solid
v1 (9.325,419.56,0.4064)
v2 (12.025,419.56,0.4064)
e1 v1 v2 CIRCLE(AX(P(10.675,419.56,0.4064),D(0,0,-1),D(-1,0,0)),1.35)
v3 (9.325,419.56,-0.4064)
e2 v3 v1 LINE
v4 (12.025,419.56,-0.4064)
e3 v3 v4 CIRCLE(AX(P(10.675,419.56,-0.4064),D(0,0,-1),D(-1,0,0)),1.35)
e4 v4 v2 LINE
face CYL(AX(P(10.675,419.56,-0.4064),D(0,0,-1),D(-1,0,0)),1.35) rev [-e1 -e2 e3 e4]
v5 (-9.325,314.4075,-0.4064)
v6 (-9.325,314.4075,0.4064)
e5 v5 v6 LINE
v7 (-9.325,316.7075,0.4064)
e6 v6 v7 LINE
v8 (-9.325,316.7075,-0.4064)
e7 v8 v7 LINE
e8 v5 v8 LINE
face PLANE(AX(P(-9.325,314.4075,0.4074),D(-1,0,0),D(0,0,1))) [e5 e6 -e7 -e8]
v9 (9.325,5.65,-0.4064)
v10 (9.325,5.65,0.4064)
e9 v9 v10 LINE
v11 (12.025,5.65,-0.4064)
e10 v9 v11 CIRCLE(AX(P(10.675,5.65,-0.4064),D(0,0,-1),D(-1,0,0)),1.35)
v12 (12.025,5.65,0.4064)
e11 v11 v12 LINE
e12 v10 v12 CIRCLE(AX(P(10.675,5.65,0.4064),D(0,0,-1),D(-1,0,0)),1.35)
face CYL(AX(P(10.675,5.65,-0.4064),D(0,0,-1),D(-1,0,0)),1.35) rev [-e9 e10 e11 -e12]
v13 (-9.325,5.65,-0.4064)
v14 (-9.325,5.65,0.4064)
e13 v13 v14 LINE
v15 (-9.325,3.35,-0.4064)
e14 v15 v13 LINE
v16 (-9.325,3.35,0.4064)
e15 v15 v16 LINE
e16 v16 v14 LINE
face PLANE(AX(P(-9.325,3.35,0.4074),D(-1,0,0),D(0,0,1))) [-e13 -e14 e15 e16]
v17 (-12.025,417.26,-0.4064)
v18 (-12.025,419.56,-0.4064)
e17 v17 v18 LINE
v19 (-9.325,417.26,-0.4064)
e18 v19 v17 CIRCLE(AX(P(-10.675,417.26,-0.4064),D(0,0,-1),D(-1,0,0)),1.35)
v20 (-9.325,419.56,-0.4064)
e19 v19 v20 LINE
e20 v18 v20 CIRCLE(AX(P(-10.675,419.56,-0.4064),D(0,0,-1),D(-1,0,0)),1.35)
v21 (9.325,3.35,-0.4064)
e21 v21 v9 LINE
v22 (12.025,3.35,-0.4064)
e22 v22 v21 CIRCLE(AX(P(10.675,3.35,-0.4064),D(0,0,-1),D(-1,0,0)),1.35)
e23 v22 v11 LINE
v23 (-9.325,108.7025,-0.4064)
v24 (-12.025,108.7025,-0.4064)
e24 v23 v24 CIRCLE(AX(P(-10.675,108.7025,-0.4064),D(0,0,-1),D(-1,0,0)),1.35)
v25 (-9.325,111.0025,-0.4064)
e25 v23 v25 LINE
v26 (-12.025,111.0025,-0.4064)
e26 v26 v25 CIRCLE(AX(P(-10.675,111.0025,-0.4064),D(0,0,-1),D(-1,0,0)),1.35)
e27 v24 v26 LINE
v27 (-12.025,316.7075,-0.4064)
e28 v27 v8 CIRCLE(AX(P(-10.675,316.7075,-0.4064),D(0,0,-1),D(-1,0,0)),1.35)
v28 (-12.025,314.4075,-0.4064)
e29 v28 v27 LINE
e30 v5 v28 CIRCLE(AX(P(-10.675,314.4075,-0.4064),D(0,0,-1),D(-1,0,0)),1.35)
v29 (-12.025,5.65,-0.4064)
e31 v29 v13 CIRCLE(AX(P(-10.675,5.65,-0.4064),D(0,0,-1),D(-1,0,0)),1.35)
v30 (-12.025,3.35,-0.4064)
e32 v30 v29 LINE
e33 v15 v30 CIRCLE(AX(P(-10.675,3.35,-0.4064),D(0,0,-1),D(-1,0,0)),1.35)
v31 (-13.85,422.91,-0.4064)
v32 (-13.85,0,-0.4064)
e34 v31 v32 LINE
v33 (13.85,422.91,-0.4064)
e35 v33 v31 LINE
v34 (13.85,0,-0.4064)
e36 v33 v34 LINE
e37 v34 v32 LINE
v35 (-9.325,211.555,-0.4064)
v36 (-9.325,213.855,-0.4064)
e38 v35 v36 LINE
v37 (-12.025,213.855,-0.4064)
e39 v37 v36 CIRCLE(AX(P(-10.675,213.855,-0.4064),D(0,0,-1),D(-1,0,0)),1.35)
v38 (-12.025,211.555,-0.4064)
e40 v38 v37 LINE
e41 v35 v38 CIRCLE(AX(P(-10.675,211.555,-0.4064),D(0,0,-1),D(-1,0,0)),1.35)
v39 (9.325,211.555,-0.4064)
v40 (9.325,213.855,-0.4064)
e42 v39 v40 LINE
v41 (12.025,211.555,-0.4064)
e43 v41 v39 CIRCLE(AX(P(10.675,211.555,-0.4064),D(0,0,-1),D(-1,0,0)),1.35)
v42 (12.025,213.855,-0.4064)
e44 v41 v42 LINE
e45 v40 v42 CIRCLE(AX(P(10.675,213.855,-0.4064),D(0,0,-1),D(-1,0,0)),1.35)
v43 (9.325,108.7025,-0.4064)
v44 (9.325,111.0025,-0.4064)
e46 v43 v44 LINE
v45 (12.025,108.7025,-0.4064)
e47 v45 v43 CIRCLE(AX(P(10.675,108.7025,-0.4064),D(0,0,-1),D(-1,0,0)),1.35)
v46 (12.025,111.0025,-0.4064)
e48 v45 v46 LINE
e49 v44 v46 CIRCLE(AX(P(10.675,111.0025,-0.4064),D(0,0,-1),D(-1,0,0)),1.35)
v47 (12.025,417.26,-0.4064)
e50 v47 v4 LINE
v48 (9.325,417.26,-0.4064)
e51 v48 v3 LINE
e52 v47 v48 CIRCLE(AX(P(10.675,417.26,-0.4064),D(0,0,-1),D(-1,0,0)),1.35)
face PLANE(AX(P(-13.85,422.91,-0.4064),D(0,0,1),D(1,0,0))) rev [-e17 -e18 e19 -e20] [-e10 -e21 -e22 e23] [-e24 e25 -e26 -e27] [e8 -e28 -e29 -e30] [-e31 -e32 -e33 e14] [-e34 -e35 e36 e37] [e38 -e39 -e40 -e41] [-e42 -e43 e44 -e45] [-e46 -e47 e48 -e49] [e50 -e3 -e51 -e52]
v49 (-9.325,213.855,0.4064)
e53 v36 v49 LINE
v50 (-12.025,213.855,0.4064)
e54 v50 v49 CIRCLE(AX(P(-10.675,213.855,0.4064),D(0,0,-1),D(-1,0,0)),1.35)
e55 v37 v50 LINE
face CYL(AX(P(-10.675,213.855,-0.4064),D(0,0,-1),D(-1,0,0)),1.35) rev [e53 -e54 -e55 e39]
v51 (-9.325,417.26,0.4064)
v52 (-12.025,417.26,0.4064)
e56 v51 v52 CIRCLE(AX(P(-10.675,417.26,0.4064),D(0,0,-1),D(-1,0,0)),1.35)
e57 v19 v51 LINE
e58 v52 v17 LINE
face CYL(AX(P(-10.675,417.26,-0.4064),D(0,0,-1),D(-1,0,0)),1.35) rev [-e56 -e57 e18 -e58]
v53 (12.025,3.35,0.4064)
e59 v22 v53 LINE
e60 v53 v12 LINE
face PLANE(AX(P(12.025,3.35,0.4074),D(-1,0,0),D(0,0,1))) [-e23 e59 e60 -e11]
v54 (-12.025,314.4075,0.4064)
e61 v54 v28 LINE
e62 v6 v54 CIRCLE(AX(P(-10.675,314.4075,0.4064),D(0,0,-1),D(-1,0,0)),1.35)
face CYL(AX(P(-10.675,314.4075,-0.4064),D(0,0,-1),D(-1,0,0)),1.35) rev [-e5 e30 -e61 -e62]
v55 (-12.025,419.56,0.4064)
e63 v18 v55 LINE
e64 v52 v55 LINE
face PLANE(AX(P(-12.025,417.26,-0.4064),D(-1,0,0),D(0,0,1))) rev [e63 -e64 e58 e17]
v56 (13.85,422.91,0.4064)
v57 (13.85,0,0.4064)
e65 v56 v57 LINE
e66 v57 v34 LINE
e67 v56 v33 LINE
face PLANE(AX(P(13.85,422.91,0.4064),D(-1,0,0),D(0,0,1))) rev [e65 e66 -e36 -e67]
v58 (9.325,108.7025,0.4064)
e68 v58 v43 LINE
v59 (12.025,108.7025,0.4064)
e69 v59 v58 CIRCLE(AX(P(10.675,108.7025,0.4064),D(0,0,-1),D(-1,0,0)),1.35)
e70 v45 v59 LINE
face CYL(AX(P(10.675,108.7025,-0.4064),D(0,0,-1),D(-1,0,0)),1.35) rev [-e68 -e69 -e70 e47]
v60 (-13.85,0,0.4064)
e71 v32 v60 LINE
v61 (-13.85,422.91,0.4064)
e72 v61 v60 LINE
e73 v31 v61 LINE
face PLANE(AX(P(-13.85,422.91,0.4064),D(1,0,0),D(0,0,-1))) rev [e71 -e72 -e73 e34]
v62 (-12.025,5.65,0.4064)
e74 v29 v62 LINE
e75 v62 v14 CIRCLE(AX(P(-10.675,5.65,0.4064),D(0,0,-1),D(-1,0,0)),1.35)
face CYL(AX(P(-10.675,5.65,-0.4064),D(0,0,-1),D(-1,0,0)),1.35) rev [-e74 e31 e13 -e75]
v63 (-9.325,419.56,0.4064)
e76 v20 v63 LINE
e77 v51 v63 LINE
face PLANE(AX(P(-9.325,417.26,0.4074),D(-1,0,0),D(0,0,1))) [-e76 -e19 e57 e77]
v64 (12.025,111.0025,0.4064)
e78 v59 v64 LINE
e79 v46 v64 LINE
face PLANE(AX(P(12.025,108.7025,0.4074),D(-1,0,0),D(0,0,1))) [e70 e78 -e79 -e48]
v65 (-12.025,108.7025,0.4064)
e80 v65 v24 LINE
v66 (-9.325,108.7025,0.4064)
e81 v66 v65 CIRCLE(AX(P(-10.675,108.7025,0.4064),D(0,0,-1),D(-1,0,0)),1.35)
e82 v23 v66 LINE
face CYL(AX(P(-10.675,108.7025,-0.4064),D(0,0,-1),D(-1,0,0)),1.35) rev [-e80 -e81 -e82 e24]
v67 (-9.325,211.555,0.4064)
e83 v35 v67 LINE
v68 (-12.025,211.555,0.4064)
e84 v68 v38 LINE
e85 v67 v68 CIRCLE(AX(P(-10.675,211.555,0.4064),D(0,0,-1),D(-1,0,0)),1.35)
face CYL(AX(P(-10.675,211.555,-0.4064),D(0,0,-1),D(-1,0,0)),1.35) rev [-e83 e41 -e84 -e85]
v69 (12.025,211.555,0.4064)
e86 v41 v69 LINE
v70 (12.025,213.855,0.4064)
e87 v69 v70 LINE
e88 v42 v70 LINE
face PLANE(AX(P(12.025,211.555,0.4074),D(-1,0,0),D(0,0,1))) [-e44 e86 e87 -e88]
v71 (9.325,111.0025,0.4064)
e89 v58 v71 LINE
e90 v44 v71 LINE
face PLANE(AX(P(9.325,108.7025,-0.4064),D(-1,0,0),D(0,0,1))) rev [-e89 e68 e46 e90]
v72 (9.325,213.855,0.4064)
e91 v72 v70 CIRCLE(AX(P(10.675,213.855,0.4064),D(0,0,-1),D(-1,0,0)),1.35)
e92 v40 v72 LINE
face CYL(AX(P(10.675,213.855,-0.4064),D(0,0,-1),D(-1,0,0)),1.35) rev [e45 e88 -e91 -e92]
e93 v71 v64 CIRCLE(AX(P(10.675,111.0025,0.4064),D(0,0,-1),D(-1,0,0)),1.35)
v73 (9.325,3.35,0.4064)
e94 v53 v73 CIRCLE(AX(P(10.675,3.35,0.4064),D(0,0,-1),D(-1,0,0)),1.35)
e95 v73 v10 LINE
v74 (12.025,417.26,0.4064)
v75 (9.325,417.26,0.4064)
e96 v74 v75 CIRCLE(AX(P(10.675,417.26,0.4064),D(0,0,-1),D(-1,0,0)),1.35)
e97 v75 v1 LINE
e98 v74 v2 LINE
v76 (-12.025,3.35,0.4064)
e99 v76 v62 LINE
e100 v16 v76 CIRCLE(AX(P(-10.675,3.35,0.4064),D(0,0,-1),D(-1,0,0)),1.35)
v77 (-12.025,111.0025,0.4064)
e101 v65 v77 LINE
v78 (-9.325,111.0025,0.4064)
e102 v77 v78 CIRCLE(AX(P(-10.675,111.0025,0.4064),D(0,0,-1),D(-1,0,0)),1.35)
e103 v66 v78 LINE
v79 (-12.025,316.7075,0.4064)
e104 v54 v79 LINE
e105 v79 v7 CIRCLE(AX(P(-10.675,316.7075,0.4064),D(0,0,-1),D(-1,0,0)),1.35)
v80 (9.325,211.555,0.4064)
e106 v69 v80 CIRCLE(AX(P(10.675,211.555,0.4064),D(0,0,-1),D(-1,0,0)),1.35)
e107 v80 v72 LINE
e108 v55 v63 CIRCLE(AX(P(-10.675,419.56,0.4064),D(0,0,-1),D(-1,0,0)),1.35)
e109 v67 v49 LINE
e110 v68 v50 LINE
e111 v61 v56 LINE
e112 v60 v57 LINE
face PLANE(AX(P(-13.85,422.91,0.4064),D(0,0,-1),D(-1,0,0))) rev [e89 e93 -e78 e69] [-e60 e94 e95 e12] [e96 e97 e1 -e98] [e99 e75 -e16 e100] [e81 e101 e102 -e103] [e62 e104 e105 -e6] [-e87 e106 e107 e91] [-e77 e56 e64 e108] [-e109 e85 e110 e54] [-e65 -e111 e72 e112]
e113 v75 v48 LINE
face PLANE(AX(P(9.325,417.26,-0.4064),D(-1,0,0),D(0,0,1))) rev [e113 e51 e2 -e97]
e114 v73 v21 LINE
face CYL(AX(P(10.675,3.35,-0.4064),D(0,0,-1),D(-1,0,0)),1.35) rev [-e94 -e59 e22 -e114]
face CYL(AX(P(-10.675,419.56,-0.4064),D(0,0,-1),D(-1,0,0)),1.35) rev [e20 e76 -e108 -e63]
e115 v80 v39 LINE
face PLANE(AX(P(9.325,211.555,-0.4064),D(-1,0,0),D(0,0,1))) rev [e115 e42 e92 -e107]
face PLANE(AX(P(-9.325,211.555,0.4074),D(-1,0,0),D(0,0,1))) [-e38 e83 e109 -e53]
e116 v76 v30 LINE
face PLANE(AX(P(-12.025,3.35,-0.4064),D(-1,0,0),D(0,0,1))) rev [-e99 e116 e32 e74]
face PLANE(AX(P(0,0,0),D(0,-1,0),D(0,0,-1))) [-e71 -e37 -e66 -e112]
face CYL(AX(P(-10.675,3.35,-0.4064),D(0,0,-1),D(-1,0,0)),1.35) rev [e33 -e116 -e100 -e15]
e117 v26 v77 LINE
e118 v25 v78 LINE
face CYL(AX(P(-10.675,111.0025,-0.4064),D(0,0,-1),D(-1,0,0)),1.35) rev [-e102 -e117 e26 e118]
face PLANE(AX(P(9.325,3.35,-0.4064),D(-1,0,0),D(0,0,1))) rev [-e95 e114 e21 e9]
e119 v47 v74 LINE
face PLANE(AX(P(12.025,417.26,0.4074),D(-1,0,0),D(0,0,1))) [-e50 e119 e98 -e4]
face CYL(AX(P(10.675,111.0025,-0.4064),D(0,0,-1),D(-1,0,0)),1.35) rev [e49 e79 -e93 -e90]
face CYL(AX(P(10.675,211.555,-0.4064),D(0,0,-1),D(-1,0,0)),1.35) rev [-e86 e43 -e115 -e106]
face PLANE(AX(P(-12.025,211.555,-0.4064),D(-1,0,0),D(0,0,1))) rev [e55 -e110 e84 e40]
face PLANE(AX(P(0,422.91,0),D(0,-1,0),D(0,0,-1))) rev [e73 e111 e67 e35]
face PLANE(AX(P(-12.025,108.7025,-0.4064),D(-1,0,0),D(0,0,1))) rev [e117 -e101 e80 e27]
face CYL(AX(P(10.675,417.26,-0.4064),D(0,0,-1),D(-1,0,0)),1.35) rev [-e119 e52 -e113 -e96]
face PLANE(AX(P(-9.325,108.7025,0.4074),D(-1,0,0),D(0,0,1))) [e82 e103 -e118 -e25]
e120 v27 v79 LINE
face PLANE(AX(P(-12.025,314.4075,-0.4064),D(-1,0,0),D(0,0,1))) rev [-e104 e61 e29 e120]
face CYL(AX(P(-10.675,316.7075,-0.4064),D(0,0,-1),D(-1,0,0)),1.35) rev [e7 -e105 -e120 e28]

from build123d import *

# Parameters (mm, degrees)
SKETCH1_W                  = 27.7
SKETCH1_H                  = 0.8128
BOSS_EXTRUDE1_DEPTH        = 422.91
M2_5_START                 = -0.4064
M2_5_CLEARANCE_SLOT2_DEPTH = 0.8128


# Read off the part's stored shape, not the designer's step: M2.5 Clearance Slot2
with BuildPart() as part:
    # Sketch1 → Boss-Extrude1 (new body)
    with BuildSketch(Plane(origin=(0, 0, 0), x_dir=(1, 0, 0), z_dir=(0, 1, 0))):
        Rectangle(SKETCH1_W, SKETCH1_H)
    extrude(amount=BOSS_EXTRUDE1_DEPTH)

    # M2.5 Clearance Slot2 outline → M2.5 Clearance Slot2 (cut)
    with BuildSketch(Plane.XY.offset(M2_5_START)):
        with BuildLine():
            ThreePointArc((-9.325, 111.0025), (-10.675, 112.3525), (-12.025, 111.0025))
            Line((-12.025, 111.0025), (-12.025, 108.7025))
            ThreePointArc((-12.025, 108.7025), (-10.675, 107.3525), (-9.325, 108.7025))
            Line((-9.325, 108.7025), (-9.325, 111.0025))
        make_face()
        with BuildLine():
            Line((-9.325, 211.555), (-9.325, 213.855))
            ThreePointArc((-9.325, 213.855), (-10.675, 215.205), (-12.025, 213.855))
            Line((-12.025, 213.855), (-12.025, 211.555))
            ThreePointArc((-12.025, 211.555), (-10.675, 210.205), (-9.325, 211.555))
        make_face()
        with BuildLine():
            Line((-9.325, 314.4075), (-9.325, 316.7075))
            ThreePointArc((-9.325, 316.7075), (-10.675, 318.0575), (-12.025, 316.7075))
            Line((-12.025, 316.7075), (-12.025, 314.4075))
            ThreePointArc((-12.025, 314.4075), (-10.675, 313.0575), (-9.325, 314.4075))
        make_face()
        with BuildLine():
            Line((-9.325, 417.26), (-9.325, 419.56))
            ThreePointArc((-9.325, 419.56), (-10.675, 420.91), (-12.025, 419.56))
            Line((-12.025, 419.56), (-12.025, 417.26))
            ThreePointArc((-12.025, 417.26), (-10.675, 415.91), (-9.325, 417.26))
        make_face()
        with BuildLine():
            Line((-9.325, 3.35), (-9.325, 5.65))
            ThreePointArc((-9.325, 5.65), (-10.675, 7), (-12.025, 5.65))
            Line((-12.025, 5.65), (-12.025, 3.35))
            ThreePointArc((-12.025, 3.35), (-10.675, 2), (-9.325, 3.35))
        make_face()
        with BuildLine():
            ThreePointArc((12.025, 111.0025), (10.675, 112.3525), (9.325, 111.0025))
            Line((9.325, 111.0025), (9.325, 108.7025))
            ThreePointArc((9.325, 108.7025), (10.675, 107.3525), (12.025, 108.7025))
            Line((12.025, 108.7025), (12.025, 111.0025))
        make_face()
        with BuildLine():
            Line((12.025, 211.555), (12.025, 213.855))
            ThreePointArc((12.025, 213.855), (10.675, 215.205), (9.325, 213.855))
            Line((9.325, 213.855), (9.325, 211.555))
            ThreePointArc((9.325, 211.555), (10.675, 210.205), (12.025, 211.555))
        make_face()
        with BuildLine():
            Line((12.025, 417.26), (12.025, 419.56))
            ThreePointArc((12.025, 419.56), (10.675, 420.91), (9.325, 419.56))
            Line((9.325, 419.56), (9.325, 417.26))
            ThreePointArc((9.325, 417.26), (10.675, 415.91), (12.025, 417.26))
        make_face()
        with BuildLine():
            Line((12.025, 3.35), (12.025, 5.65))
            ThreePointArc((12.025, 5.65), (10.675, 7), (9.325, 5.65))
            Line((9.325, 5.65), (9.325, 3.35))
            ThreePointArc((9.325, 3.35), (10.675, 2), (12.025, 3.35))
        make_face()
    extrude(amount=M2_5_CLEARANCE_SLOT2_DEPTH, mode=Mode.SUBTRACT)


solid = part.part
